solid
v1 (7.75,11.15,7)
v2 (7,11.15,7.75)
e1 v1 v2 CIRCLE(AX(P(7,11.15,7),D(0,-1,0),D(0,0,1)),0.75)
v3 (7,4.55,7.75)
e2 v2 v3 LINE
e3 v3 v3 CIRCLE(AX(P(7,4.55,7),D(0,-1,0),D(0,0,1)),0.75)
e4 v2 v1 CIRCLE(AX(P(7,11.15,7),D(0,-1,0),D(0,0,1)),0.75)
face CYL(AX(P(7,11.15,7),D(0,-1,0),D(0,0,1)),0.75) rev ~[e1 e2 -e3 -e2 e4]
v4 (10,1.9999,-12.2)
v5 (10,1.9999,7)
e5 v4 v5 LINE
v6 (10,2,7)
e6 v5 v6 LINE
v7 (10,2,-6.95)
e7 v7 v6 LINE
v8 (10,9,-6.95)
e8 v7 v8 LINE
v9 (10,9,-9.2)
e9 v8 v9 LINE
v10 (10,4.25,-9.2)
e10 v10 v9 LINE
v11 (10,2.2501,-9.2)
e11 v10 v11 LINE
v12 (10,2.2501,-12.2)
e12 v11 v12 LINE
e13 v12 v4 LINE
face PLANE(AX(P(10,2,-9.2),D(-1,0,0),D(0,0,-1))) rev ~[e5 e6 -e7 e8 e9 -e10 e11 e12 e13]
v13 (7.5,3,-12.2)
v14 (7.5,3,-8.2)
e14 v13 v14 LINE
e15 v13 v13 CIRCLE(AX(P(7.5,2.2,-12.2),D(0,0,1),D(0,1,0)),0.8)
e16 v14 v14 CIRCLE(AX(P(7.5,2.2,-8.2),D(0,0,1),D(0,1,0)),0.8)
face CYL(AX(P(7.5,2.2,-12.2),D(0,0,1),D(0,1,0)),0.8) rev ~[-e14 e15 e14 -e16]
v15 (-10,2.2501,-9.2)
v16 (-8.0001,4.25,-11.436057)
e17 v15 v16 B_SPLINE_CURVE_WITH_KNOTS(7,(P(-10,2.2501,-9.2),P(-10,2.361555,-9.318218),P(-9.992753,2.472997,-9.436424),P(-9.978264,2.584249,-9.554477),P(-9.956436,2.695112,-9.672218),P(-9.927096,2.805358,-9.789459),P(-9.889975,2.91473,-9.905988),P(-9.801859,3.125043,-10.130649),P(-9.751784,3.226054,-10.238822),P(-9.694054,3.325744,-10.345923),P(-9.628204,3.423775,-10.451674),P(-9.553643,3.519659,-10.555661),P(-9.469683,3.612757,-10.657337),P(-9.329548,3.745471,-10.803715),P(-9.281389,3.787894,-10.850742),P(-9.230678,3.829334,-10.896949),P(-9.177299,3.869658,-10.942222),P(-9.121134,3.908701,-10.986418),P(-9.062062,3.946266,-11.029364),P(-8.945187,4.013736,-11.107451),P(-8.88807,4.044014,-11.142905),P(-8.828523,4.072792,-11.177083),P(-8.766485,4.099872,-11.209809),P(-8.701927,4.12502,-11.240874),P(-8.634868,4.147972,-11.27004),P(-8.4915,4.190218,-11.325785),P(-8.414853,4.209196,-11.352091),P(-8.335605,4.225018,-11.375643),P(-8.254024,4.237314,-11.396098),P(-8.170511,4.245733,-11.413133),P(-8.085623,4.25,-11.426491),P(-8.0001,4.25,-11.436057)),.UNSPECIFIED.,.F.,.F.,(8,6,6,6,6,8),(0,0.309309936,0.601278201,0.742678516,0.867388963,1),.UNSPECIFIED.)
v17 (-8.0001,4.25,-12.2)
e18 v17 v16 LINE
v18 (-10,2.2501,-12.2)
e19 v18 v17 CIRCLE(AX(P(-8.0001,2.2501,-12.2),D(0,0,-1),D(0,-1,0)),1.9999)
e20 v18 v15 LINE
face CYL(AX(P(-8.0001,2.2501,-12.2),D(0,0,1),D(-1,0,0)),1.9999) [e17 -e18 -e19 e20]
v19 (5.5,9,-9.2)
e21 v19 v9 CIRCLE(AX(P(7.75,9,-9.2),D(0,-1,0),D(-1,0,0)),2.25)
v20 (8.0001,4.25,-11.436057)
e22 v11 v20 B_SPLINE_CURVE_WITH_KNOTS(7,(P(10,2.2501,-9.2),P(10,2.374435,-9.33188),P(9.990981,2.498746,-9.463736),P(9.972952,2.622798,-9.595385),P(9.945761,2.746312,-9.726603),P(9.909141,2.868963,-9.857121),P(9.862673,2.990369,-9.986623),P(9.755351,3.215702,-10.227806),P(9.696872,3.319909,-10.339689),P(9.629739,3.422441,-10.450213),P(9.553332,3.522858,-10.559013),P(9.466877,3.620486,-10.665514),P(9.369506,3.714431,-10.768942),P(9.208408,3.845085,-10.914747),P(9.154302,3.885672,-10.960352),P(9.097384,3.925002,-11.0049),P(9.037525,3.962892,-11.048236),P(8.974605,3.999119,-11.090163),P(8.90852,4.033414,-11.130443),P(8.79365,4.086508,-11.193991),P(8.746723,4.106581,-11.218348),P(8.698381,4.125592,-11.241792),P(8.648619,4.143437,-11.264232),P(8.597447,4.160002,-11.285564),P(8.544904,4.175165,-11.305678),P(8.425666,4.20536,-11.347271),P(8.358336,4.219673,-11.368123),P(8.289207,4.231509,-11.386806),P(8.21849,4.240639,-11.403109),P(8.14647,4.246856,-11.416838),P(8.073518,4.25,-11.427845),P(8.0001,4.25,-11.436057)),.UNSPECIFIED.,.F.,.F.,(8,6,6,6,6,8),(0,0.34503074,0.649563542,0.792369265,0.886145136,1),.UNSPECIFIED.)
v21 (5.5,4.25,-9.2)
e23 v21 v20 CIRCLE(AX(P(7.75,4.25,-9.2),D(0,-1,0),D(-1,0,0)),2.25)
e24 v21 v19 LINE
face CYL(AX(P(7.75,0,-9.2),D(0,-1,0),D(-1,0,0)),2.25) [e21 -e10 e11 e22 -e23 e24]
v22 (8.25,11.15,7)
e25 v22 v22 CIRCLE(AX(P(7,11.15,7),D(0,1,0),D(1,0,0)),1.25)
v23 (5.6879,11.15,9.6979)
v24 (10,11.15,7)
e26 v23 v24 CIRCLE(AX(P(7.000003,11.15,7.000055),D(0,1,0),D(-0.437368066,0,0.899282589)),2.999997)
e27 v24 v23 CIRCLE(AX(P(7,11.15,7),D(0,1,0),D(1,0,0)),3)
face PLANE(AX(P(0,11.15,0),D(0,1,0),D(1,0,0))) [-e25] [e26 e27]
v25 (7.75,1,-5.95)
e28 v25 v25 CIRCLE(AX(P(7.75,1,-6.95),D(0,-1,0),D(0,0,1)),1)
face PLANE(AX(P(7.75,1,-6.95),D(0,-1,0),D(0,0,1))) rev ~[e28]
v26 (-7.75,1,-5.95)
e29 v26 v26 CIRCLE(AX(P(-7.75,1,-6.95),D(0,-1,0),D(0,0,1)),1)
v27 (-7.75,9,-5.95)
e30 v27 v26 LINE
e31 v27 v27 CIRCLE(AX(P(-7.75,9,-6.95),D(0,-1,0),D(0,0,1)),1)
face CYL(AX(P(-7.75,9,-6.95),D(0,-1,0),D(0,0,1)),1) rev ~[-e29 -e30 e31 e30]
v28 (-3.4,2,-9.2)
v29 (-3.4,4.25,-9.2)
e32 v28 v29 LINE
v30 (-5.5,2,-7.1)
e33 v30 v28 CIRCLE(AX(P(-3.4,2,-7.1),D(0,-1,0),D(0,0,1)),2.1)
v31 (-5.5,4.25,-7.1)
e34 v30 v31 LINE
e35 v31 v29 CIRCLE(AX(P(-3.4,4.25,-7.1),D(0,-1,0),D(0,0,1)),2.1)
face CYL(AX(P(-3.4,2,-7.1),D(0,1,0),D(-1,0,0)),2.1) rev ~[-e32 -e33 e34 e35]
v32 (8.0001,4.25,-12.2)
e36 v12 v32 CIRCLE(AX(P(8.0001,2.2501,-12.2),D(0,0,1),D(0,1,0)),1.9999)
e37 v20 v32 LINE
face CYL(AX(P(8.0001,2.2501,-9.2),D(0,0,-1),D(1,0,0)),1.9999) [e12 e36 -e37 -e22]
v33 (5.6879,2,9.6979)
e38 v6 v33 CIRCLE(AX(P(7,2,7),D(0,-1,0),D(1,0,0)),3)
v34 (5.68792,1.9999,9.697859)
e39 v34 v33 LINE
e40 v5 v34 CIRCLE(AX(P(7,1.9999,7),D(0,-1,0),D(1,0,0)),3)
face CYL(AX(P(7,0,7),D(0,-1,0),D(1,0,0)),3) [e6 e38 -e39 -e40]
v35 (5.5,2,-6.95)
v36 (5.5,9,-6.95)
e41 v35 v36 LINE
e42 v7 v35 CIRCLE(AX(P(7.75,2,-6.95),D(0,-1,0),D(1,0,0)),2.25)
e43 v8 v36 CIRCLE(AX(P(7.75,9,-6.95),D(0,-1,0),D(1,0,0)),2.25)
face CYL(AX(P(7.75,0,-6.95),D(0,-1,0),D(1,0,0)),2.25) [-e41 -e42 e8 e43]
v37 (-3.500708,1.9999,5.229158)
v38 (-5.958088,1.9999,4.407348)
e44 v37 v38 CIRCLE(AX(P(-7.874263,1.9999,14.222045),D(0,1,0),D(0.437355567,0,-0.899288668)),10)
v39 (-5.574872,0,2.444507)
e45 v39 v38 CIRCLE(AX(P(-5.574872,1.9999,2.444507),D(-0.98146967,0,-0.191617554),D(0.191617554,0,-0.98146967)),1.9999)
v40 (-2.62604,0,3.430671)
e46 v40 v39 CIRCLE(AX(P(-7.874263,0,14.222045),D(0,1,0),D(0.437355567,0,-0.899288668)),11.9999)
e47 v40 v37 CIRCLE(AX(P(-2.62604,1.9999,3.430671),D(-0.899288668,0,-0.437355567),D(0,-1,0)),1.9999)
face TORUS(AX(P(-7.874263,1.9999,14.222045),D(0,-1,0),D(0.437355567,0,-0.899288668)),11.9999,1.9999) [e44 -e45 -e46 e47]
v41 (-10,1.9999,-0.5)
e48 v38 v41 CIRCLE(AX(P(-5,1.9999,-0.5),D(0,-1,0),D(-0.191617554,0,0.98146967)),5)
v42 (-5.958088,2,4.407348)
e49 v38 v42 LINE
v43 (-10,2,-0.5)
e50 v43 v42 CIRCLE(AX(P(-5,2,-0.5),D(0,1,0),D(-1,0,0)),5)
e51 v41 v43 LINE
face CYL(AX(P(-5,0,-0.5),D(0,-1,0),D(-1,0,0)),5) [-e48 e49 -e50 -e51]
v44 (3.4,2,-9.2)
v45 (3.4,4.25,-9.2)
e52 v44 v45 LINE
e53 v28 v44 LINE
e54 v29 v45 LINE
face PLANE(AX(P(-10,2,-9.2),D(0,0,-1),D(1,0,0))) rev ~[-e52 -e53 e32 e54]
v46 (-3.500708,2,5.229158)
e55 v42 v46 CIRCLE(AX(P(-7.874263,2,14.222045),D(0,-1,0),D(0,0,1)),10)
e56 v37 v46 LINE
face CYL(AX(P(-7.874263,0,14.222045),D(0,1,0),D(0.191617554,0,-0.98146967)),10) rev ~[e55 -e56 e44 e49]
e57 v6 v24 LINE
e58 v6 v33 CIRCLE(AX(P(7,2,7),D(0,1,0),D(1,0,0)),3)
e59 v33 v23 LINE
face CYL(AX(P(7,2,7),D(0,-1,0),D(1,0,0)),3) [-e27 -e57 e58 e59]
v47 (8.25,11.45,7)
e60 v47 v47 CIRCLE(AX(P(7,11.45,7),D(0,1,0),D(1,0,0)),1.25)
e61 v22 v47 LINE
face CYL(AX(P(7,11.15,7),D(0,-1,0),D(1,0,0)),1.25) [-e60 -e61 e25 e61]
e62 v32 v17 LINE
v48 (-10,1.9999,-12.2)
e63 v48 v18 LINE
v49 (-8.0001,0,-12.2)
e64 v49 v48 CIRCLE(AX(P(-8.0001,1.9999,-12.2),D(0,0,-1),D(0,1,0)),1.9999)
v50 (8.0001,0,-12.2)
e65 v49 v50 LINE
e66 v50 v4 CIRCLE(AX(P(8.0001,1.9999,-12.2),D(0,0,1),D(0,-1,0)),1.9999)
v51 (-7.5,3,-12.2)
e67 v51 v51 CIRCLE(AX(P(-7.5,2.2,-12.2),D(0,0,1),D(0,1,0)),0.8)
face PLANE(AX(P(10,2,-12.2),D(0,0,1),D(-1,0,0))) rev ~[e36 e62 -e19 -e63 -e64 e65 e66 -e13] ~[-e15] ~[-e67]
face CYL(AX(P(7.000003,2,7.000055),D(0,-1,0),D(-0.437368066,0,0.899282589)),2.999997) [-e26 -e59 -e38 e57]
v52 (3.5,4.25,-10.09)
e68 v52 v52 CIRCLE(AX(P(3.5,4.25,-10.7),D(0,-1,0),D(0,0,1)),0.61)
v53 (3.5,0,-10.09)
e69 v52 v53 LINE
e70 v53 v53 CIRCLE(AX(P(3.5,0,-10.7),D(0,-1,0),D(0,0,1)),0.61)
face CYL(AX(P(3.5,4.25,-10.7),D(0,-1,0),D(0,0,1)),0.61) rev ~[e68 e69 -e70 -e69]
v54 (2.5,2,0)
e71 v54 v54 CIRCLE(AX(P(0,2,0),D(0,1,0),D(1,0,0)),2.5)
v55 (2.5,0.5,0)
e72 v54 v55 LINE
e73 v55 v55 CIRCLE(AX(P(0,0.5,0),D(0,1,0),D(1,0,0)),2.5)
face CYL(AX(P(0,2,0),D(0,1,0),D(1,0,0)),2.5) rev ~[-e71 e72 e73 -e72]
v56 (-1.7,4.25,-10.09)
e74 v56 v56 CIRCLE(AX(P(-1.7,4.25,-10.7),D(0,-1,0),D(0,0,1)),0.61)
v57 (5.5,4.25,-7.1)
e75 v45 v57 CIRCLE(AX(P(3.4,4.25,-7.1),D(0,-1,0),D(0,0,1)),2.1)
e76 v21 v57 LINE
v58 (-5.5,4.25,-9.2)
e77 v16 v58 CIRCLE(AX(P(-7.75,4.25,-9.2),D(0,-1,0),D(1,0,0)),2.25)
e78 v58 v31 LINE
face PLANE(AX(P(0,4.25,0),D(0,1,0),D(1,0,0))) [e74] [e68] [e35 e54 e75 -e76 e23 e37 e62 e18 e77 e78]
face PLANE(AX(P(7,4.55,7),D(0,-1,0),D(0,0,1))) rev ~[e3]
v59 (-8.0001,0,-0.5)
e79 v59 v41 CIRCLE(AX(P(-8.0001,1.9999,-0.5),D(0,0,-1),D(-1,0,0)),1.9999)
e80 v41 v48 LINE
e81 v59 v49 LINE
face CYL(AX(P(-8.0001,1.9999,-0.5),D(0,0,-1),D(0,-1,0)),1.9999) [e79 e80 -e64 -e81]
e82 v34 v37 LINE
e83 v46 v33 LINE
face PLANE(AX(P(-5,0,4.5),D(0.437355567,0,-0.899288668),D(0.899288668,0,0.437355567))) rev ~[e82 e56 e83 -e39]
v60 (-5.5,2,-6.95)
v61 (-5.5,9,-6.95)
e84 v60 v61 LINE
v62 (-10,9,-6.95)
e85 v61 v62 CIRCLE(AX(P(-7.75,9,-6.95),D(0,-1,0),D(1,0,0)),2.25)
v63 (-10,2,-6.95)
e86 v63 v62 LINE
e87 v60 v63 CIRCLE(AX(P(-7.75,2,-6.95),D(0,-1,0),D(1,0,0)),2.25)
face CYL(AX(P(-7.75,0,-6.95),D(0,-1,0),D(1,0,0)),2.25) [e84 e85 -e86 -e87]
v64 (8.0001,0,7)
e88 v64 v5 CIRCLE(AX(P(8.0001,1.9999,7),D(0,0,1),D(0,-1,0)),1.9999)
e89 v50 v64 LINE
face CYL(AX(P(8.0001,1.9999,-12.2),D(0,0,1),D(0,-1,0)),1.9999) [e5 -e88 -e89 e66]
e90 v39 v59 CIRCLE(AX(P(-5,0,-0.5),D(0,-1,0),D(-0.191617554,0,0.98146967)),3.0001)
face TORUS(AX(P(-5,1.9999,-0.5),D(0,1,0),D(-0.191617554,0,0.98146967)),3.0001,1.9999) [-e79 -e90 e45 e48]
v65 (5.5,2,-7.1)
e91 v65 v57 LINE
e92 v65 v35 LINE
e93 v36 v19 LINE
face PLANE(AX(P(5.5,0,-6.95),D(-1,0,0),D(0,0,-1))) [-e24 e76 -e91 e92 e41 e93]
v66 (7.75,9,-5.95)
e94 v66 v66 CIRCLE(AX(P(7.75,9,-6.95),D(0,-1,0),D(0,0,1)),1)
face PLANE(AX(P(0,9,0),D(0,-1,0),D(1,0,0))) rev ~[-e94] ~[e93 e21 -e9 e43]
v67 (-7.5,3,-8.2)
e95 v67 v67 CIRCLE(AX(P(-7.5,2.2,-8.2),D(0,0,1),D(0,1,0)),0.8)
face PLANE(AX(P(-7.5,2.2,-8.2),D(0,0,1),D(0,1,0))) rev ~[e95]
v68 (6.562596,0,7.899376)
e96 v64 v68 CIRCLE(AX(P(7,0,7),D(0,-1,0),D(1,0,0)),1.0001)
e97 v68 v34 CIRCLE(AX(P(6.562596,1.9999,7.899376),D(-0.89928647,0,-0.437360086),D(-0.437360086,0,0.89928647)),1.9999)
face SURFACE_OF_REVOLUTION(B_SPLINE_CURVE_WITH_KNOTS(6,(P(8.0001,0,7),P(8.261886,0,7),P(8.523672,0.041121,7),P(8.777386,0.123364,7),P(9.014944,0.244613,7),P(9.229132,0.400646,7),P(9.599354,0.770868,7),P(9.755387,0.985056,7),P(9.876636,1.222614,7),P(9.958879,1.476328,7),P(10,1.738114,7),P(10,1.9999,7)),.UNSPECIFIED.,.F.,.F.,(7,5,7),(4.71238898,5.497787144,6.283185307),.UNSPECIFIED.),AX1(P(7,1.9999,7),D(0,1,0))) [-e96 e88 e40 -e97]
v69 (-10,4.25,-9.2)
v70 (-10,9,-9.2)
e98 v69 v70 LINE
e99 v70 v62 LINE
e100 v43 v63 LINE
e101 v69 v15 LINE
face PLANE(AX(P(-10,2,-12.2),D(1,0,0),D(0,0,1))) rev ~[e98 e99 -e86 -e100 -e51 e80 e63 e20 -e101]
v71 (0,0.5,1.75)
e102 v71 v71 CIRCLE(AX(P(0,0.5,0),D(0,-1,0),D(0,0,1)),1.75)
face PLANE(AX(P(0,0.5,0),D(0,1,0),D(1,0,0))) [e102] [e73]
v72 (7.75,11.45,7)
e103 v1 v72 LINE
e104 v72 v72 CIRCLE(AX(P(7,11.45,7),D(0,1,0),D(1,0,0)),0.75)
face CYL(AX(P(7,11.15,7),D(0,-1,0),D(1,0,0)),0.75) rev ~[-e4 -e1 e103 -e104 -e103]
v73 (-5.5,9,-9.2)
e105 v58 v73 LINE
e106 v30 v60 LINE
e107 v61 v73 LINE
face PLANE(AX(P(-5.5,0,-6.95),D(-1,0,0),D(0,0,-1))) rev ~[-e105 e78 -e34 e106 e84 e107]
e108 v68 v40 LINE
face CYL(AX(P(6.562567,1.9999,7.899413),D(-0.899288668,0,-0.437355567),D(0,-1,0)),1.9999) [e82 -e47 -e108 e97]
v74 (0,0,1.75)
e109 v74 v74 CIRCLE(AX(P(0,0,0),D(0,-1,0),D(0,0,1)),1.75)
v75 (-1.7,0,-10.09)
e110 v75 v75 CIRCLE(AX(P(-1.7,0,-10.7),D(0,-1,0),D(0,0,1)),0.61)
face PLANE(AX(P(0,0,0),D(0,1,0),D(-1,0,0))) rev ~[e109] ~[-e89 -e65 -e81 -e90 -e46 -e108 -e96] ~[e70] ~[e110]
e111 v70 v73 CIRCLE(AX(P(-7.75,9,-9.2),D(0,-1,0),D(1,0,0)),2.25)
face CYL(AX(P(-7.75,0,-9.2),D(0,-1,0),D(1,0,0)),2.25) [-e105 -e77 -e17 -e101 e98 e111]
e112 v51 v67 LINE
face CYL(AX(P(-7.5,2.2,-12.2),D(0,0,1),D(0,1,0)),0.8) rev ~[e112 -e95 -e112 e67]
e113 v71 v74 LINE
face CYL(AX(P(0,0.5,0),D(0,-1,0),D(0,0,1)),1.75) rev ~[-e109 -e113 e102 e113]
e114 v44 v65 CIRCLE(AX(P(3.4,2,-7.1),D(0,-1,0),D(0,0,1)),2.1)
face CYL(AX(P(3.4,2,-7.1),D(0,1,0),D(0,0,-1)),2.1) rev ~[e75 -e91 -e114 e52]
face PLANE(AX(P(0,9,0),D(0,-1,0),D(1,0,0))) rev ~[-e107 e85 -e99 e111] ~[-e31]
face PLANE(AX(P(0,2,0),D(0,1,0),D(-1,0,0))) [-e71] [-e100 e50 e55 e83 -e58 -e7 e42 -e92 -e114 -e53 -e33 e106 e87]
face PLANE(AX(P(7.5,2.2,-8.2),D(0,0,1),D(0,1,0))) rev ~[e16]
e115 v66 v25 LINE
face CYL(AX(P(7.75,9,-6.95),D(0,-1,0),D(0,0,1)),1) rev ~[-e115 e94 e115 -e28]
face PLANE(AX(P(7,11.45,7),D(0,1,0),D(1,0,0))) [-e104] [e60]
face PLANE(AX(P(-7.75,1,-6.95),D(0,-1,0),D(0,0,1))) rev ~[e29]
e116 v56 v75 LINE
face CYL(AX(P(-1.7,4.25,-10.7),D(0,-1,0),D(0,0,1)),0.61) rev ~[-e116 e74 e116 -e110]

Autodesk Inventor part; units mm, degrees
ref_plane "YZ Plane" through (0, 0, 0) normal (1, 0, 0) x (0, 1, 0)
ref_plane "XZ Plane" through (0, 0, 0) normal (0, 1, 0) x (-1, 0, 0)
ref_plane "XY Plane" through (0, 0, 0) normal (0, 0, 1) x (1, 0, 0)
sketch "Sketch1" plane through (0, 0, 0) normal (0, 1, 0) x (-1, 0, 0)
  line L0 (-5, 4.5) -> (5, 4.5)
  line L1 (10, -0.5) -> (10, -12.2)
  line L2 (10, -12.2) -> (-10, -12.2)
  line L3 (-10, -12.2) -> (-10, -0.5)
  line L4 (0, 0) -> (0, -71.875) construction
  arc A0 (10, -0.5) -> (5, 4.5) centre (5, -0.5) ccw
  arc A1 (-5, 4.5) -> (-10, -0.5) centre (-5, -0.5) ccw
  point P0 (-10, 4.5)
  point P1 (10, 4.5)
  dimension "d0" = 20
  dimension "d1" = 12.2
  dimension "d2" = 4.5
  dimension "d28" = 5
extrude "Extrusion1" add sketch "Sketch1" along normal blind 2
sketch "Sketch2" plane through (0, 2, 0) normal (0, 1, 0) x (1, 0, 0)
  circle A0 centre (0, 0) radius 2.5
  dimension "d6" = 5
extrude "Extrusion2" cut sketch "Sketch2" against normal blind 1.5
hole "Hole1" at (0, 0.5, 0) direction (0, -1, 0) diameter 3.5 end through all
sketch "Sketch7" plane through (0, 2, 0) normal (0, 1, 0) x (1, 0, 0)
  line L0 (15, 10.7) -> (-18, 10.7) construction
  line L1 (3.5, 10.7) -> (-1.7, 10.7) construction
  circle A0 centre (0, 0) radius 2.5 projected
  line L2 (-10, 12.2) -> (-10, 0.5) projected
  arc A1 (-10, 0.5) -> (-5, -4.5) centre (-5, 0.5) ccw projected
  line L3 (-5, -4.5) -> (5, -4.5) projected
  arc A2 (5, -4.5) -> (10, 0.5) centre (5, 0.5) ccw projected
  line L4 (10, 0.5) -> (10, 12.2) projected
  line L5 (10, 12.2) -> (-10, 12.2) projected
  line L6 (10, 12.2) -> (-10, 12.2)
  line L7 (-10, 12.2) -> (-10, 9.2)
  line L8 (-10, 9.2) -> (10, 9.2)
  line L9 (10, 9.2) -> (10, 12.2)
  dimension "d44" = 10.7
  dimension "d57" = 3
extrude "Extrusion5" add sketch "Sketch7" along normal blind 2.25 contours L5 L4 L8 L2
sketch "Sketch9" plane through (0, 4.25, 0) normal (0, 1, 0) x (1, 0, 0)
  line L0 (-10, 12.2) -> (-10, 9.2) projected
  line L1 (-10, 9.2) -> (10, 9.2) projected
  line L2 (10, 9.2) -> (10, 12.2) projected
  line L3 (10, 12.2) -> (-10, 12.2) projected
  line L4 (0, 0) -> (0, 12.2) construction
  line L5 (-10, 10.7) -> (10, 10.7) construction
  line L6 (10, 0.5) -> (10, 12.2) projected
  point P0 (-1.7, 10.7)
  point P1 (3.5, 10.7)
  dimension "d58" = 3.5
  dimension "d59" = 1.7
hole "Hole5" at (-1.7, 4.25, -10.7) at (3.5, 4.25, -10.7) direction (0, -1, 0) diameter 1.22 end through all
sketch "Sketch10" plane through (0, 0, 0) normal (0, -1, 0) x (1, 0, 0)
  circle A0 centre (-1.7, -10.7) radius 0.61 projected
  circle A1 centre (3.5, -10.7) radius 0.61 projected
  circle A2 centre (0, 0) radius 1.75 projected
  line L0 (-10, -12.2) -> (-10, -0.5) projected
  line L1 (10, -12.2) -> (-10, -12.2) projected
  line L2 (10, -0.5) -> (10, -12.2) projected
  arc A3 (10, -0.5) -> (5, 4.5) centre (5, -0.5) ccw projected
  line L3 (-5, 4.5) -> (5, 4.5) projected
  arc A4 (-5, 4.5) -> (-10, -0.5) centre (-5, -0.5) ccw projected
  line L4 (10, -0.5) -> (10, -9.2) projected
  line L5 (10, -6.95) -> (-10, -6.95) construction
  line L6 (-10, -12.2) -> (-10, -0.5) projected
  line L7 (0, 0) -> (0, -12.2) construction
  arc A5 (10, -6.95) -> (5.5, -6.95) centre (7.75, -6.95) ccw
  arc A6 (-5.5, -6.95) -> (-10, -6.95) centre (-7.75, -6.95) ccw
  line L8 (-10, -9.2) -> (10, -9.2) projected
  line L9 (10, -9.2) -> (-10, -9.2) projected
  arc A7 (5.5, -9.2) -> (10, -9.2) centre (7.75, -9.2) ccw
  line L10 (10, -6.95) -> (10, -9.2)
  line L11 (5.5, -6.95) -> (5.5, -9.2)
  line L12 (-10, -9.2) -> (-10, -6.95)
  line L13 (-5.5, -6.95) -> (-5.5, -9.2)
  circle A8 centre (-7.75, -9.2) radius 2.25
  circle A9 centre (7.75, -9.2) radius 2.25
  dimension "d67" = 5.25
  dimension "d68" = 2.25
sketch "Sketch12" plane through (0, 0, 0) normal (0, -1, 0) x (1, 0, 0)
  circle A0 centre (-1.7, -10.7) radius 0.61 projected
  circle A1 centre (3.5, -10.7) radius 0.61 projected
  circle A2 centre (0, 0) radius 1.75 projected
  line L0 (-10, -12.2) -> (-10, -0.5) projected
  line L1 (10, -12.2) -> (-10, -12.2) projected
  line L2 (10, -0.5) -> (10, -12.2) projected
  arc A3 (10, -0.5) -> (5, 4.5) centre (5, -0.5) ccw projected
  line L3 (-5, 4.5) -> (5, 4.5) projected
  arc A4 (-5, 4.5) -> (-10, -0.5) centre (-5, -0.5) ccw projected
  circle A5 centre (7, 7) radius 3
  line L4 (10, -0.5) -> (10, -12.2) projected
  line L5 (10, -0.5) -> (10, 7)
  arc A6 (10, -0.5) -> (5, 4.5) centre (5, -0.5) ccw projected
  line L6 (-5, 4.5) -> (5.6879, 9.6979)
  line L7 (-5, 4.5) -> (5, 4.5) projected
  dimension "d86" = 7
  dimension "d87" = 7
extrude "Extrusion6" add sketch "Sketch12" against normal up to surface (2 mm away) contours L6 A5 A3 L3 | A3 A5 L5 | A5 A3 | A5 A3
fillet "Fillet2" radius 10 1 edges at (-5, 1, 4.5)
sketch "Sketch13" plane through (0, 2, 0) normal (0, 1, 0) x (1, 0, 0)
  arc A0 (5.6879, -9.6979) -> (10, -7) centre (7, -7) ccw projected
  circle A1 centre (7, -7) radius 3
  point P0 (0, 0)
extrude "Extrusion7" add sketch "Sketch13" along normal blind 9.15
hole "Hole8" at (7, 11.15, 7) direction (0, -1, 0) diameter 1.5 depth 6.6
sketch "Sketch14" plane through (7, 11.15, 7) normal (0, 1, 0) x (1, 0, 0)
  circle A0 centre (0, 0) radius 0.75 projected
  circle A1 centre (0, 0) radius 3 projected
  circle A2 centre (0, 0) radius 1.25
  point P0 (-7, 7)
  dimension "d102" = 2.5
extrude "Extrusion8" add sketch "Sketch14" along normal blind 0.3 contours A2
extrude "Extrusion9" add sketch "Sketch10" against normal blind 9 contours A8 L8 | L0 A6 L13 A8 | L8 A8 | A9 L11 A5 L2 | A7 L8 | L8 A9
sketch "Sketch11" plane through (10, 0, -12.2) normal (0, 0, -1) x (-1, 0, 0)
  line L0 (10, 0) -> (10, 4.25) construction
  line L1 (0, 0) -> (20, 0) projected
  line L2 (20, 0) -> (20, 4.25) projected
  line L3 (0, 4.25) -> (20, 4.25) projected
  line L4 (0, 0) -> (0, 4.25) projected
  line L5 (0, 0) -> (0, 4.25) projected
  line L6 (0, 2.2) -> (20, 2.2) construction
  point P0 (2.5, 2.2)
  point P1 (17.5, 2.2)
  dimension "d77" = 2.2
  dimension "d78" = 15
hole "Hole7" at (7.5, 2.2, -12.2) at (-7.5, 2.2, -12.2) direction (0, 0, 1) diameter 1.6 depth 4
sketch "Sketch15" plane through (0, 9, 0) normal (0, 1, 0) x (1, 0, 0)
  arc A0 (5.5, 6.95) -> (10, 6.95) centre (7.75, 6.95) ccw projected
  arc A1 (-10, 6.95) -> (-5.5, 6.95) centre (-7.75, 6.95) ccw projected
  point P0 (0, 0)
hole "Hole9" at (7.75, 9, -6.95) at (-7.75, 9, -6.95) direction (0, -1, 0) diameter 2 depth 8
fillet "Fillet3" radius 2.1 2 edges at (-5.5, 3.125, -9.2) (5.5, 3.125, -9.2)
fillet "Fillet4" radius 2 9 edges at (8.5912, 0, 9.5432) (1.0936, 0, 7.4635) (-4.7027, 0, 4.7383) (-8.8594, 0, 2.6788) (-10, 0, -3.725) (-10, 0, -10.7) (10, 0, -10.7) (10, 4.25, -10.7) (-10, 4.25, -10.7)
equation "\"d44\" = shaft_to_encoder_mount_points"
equation "\"d48\" = encoder_mount_height"
equation "\"d58\" = encoder_mount_point_1"
equation "\"d59\" = encoder_mount_point_2"
equation "\"d67\" = dist_screw_mount_point_1"
equation "\"d68\" = dist_screw_mount_point_2"
equation "\"d77\" = fingertip_mounting_dist_from_edge"
equation "\"d78\" = fingertip_mount_spacing"
equation "\"shaft_to_encoder_mount_points\" = 10.7"
equation "\"encoder_mount_point_1\" = 3.5"
equation "\"encoder_mount_point_2\" = 1.7"
equation "\"dist_screw_mount_point_1\" = 5.25"
equation "\"dist_screw_mount_point_2\" = 2.25"
equation "\"fingertip_mount_spacing\" = 15"
equation "\"encoder_mount_height\" = 2.25"
equation "\"fingertip_mounting_dist_from_edge\" = 2.2"
properties part number "phalanx_3_housing_R"
